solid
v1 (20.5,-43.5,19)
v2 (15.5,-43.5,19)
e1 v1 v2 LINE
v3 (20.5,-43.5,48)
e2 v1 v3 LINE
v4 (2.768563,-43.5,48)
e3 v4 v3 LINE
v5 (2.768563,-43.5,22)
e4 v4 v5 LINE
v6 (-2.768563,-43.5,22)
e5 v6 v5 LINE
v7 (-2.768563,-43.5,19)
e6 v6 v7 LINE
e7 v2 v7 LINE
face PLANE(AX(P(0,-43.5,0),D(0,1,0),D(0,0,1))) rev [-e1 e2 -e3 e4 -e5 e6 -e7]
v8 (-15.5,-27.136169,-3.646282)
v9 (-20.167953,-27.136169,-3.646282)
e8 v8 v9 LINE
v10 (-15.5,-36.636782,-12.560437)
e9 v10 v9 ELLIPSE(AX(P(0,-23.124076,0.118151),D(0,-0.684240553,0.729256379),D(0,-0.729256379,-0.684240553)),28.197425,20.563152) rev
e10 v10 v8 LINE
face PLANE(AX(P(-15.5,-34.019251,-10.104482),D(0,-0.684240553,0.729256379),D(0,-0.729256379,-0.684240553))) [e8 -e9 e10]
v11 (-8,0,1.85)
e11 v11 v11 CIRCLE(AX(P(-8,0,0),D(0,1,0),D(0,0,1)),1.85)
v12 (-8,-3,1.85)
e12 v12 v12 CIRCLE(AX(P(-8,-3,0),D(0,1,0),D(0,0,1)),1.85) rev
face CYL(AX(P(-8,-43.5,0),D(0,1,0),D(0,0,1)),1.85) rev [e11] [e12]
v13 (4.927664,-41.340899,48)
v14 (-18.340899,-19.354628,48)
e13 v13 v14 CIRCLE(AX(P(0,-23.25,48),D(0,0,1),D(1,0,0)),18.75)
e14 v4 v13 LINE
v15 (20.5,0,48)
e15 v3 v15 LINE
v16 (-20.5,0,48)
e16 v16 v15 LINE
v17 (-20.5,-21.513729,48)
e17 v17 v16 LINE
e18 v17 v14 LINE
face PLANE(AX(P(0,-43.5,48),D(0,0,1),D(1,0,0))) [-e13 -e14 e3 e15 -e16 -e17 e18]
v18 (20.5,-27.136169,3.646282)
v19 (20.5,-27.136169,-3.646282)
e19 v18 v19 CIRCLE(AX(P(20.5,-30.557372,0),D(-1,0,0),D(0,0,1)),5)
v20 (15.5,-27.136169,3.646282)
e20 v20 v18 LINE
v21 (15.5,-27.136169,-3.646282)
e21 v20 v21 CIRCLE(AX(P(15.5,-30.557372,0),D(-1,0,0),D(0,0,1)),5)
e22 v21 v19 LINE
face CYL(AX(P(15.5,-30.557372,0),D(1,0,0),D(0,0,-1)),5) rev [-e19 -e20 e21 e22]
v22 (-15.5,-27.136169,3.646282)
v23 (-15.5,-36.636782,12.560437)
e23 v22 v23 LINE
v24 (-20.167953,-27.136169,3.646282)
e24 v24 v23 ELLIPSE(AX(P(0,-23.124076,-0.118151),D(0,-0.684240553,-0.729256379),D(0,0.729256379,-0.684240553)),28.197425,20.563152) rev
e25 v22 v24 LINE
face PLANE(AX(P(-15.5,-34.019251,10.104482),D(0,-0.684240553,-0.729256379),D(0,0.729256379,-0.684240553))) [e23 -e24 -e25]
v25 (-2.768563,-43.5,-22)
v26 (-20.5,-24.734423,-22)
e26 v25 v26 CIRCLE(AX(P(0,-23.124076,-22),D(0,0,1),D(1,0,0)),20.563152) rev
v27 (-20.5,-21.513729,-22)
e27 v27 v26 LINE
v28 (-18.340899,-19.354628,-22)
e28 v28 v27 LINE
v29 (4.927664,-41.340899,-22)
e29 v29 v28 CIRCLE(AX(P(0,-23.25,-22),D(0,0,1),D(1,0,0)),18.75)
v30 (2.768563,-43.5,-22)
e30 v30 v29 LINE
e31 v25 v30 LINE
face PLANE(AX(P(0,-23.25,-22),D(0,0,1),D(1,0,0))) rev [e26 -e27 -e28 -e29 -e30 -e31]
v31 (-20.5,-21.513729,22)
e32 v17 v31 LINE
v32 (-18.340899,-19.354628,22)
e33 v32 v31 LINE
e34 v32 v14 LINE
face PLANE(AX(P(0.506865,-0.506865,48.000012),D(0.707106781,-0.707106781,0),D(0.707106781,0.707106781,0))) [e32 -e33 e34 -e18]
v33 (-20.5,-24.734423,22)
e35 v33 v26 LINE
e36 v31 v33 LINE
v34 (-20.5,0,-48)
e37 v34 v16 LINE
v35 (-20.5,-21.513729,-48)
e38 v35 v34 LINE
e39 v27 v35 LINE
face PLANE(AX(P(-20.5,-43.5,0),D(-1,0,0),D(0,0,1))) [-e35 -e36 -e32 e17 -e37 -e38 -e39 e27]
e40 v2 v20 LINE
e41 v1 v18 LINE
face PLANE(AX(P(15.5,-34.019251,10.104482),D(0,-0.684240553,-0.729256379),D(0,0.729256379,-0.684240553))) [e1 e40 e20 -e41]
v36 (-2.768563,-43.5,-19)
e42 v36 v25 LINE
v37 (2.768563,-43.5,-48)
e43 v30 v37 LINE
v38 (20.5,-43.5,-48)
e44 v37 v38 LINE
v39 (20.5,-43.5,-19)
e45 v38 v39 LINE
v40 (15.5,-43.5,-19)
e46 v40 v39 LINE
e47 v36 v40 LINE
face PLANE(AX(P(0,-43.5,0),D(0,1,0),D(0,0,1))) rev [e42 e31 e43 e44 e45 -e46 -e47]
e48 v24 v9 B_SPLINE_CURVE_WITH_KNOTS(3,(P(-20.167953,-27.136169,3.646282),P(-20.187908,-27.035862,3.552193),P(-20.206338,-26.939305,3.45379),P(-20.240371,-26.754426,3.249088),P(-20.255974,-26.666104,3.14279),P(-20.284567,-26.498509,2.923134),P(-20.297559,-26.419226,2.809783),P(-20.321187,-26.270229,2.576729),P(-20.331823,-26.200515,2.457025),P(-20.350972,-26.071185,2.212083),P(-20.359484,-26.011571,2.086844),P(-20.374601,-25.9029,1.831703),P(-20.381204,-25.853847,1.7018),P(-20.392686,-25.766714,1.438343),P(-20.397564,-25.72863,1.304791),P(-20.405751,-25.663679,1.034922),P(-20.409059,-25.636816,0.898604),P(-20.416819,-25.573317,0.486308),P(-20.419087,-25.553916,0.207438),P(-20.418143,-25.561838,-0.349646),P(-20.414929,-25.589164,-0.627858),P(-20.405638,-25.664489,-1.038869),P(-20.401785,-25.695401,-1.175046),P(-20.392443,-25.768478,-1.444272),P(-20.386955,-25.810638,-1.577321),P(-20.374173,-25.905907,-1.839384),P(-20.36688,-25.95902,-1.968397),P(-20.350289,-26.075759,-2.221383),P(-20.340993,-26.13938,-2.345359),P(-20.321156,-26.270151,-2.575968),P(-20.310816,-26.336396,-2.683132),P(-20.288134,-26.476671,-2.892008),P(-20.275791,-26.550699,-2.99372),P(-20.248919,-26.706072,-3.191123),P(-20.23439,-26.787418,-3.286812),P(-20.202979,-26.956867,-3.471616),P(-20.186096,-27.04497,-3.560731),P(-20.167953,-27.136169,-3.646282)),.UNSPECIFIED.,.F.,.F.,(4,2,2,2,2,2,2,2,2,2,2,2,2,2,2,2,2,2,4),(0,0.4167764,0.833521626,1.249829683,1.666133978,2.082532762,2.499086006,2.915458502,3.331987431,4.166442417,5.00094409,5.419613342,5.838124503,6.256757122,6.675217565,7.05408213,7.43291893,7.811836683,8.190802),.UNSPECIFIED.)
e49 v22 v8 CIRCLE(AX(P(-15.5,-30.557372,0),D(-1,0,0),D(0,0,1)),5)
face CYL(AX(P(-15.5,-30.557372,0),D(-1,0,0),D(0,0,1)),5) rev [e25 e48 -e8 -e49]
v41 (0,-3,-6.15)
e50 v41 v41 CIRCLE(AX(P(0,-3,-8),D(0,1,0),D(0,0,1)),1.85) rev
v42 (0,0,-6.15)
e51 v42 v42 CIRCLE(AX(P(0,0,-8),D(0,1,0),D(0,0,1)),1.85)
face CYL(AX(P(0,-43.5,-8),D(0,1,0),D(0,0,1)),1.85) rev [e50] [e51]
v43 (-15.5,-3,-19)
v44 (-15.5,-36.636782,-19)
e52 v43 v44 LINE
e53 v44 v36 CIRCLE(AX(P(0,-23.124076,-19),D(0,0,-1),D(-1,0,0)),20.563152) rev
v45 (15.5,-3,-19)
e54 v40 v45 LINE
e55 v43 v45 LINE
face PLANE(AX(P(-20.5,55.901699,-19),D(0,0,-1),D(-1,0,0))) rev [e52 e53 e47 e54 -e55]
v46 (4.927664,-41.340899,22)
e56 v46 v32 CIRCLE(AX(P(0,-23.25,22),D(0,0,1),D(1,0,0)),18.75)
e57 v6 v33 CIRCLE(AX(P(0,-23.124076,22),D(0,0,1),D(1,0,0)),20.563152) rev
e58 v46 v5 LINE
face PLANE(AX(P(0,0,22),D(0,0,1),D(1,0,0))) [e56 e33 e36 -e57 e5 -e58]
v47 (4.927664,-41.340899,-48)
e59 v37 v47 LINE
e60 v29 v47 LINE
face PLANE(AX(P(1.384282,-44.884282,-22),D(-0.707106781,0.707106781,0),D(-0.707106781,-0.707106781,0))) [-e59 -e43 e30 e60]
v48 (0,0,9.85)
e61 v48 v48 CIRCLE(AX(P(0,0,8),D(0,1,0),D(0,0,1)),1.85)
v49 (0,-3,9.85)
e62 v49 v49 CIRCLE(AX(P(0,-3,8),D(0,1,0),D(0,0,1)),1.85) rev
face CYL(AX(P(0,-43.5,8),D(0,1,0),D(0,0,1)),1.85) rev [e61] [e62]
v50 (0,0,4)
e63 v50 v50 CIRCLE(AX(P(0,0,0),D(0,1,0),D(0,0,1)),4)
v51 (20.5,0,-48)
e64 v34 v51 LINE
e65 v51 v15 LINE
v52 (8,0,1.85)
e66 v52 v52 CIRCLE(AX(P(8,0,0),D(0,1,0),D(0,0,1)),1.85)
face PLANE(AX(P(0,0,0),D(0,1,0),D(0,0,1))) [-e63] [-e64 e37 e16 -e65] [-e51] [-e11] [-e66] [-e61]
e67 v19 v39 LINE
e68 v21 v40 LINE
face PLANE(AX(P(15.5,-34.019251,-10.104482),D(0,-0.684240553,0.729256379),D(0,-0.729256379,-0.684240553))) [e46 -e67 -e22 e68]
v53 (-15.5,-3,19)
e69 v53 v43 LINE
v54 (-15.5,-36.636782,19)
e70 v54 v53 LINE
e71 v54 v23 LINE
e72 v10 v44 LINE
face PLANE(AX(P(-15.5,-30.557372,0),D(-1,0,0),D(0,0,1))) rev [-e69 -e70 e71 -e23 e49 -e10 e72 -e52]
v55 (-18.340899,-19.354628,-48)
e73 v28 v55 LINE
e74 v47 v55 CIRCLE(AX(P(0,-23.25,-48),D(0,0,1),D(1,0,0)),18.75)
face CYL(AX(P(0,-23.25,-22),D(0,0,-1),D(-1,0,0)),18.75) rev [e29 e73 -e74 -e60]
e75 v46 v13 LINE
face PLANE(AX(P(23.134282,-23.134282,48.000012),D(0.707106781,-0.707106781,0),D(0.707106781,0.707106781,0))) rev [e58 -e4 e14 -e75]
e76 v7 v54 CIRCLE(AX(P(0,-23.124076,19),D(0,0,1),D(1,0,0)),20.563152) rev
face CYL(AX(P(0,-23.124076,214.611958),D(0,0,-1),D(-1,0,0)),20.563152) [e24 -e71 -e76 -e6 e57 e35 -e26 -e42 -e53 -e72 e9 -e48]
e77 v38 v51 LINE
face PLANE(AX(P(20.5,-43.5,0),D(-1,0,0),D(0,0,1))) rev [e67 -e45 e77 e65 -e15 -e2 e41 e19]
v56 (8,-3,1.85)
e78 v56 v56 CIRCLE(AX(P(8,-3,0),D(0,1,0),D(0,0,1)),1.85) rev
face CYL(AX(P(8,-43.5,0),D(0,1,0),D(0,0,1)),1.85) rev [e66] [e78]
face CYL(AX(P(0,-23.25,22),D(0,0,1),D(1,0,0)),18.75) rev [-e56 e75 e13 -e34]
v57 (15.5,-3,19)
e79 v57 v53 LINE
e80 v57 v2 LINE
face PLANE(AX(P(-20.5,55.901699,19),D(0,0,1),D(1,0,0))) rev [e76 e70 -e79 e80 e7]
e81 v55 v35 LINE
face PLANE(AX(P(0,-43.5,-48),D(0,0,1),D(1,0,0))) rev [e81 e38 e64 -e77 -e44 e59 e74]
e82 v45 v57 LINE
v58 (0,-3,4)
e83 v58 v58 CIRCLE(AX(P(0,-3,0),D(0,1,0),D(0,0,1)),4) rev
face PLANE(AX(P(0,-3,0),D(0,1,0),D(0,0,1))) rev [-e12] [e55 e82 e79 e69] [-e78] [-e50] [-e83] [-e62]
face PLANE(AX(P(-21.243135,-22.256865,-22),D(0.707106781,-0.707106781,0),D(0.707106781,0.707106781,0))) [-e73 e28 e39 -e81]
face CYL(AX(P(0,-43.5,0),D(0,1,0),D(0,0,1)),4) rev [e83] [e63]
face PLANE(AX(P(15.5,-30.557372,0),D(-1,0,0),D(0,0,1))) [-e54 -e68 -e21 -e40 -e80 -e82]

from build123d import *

# Parameters (mm, degrees)
SKETCH1_W               = 41
SKETCH1_H               = 96
SKETCH1_R               = 4
SKETCH1_R_2             = 1.85
BOSS_EXTRUDE1_DEPTH     = 43.5
CUT_EXTRUDE1_DEPTH      = 108.370852656
CUT_EXTRUDE1_DEPTH_BACK = 26
CUT_EXTRUDE2_START      = -96
CUT_EXTRUDE2_DEPTH      = 26
SKETCH4_W               = 41
SKETCH4_H               = 38
CUT_EXTRUDE4_DEPTH      = 40.5
BOSS_EXTRUDE2_START     = 20.5
BOSS_EXTRUDE2_DEPTH     = 5
BOSS_EXTRUDE3_START     = -15.5
BOSS_EXTRUDE3_DEPTH     = 5
CUT_EXTRUDE5_START      = -44
CUT_EXTRUDE5_DEPTH      = 44


# Read off the part's stored shape, not the designer's step: Cut-Extrude5
with BuildPart() as part:
    # Sketch1 → Boss-Extrude1 (new body)
    with BuildSketch(Plane(origin=(0, 0, 0), x_dir=(1, 0, 0), z_dir=(0, 1, 0))):
        Rectangle(SKETCH1_W, SKETCH1_H)
        with Locations(Location((0, 0, 0), (0, 0, 270))):
            Circle(SKETCH1_R, mode=Mode.SUBTRACT)
        with Locations(Location((0, -8, 0), (0, 0, 270))):
            Circle(SKETCH1_R_2, mode=Mode.SUBTRACT)
        with Locations(Location((-8, 0, 0), (0, 0, 270))):
            Circle(SKETCH1_R_2, mode=Mode.SUBTRACT)
        with Locations(Location((0, 8, 0), (0, 0, 270))):
            Circle(SKETCH1_R_2, mode=Mode.SUBTRACT)
        with Locations(Location((8, 0, 0), (0, 0, 270))):
            Circle(SKETCH1_R_2, mode=Mode.SUBTRACT)
    extrude(amount=-BOSS_EXTRUDE1_DEPTH)

    # Sketch3 → Cut-Extrude1 (cut, two sides: drawn at the far end of the back side and taken through both)
    with BuildSketch(Plane.XY.offset(48).offset(-CUT_EXTRUDE1_DEPTH_BACK)):
        with BuildLine():
            Line((-18.340899032, -19.35462804), (-20.5, -21.513729008))
            Line((-20.5, -21.513729008), (-20.5, -43.5))
            Line((-20.5, -43.5), (2.768563004, -43.5))
            Line((2.768563004, -43.5), (4.927663972, -41.340899032))
            ThreePointArc((4.927663972, -41.340899032), (12.877412268, -9.621546189), (-18.340899032, -19.35462804))
        make_face()
    extrude(amount=CUT_EXTRUDE1_DEPTH + CUT_EXTRUDE1_DEPTH_BACK, mode=Mode.SUBTRACT)

    # Sketch3<4> → Cut-Extrude2 (cut)
    with BuildSketch(Plane.XY.offset(48).offset(CUT_EXTRUDE2_START)):
        with BuildLine():
            Line((-18.340899032, -19.35462804), (-20.5, -21.513729008))
            Line((-20.5, -21.513729008), (-20.5, -43.5))
            Line((-20.5, -43.5), (2.768563004, -43.5))
            Line((2.768563004, -43.5), (4.927663972, -41.340899032))
            ThreePointArc((4.927663972, -41.340899032), (12.877412268, -9.621546189), (-18.340899032, -19.35462804))
        make_face()
    extrude(amount=CUT_EXTRUDE2_DEPTH, mode=Mode.SUBTRACT)

    # Sketch4 → Cut-Extrude4 (cut)
    with BuildSketch(Plane.XZ.offset(43.5)):
        Rectangle(SKETCH4_W, SKETCH4_H)
    extrude(amount=-CUT_EXTRUDE4_DEPTH, mode=Mode.SUBTRACT)

    # Sketch5 → Boss-Extrude2 (add)
    with BuildSketch(Plane(origin=(0, 0, 0), x_dir=(0, 0, -1), z_dir=(1, 0, 0)).offset(BOSS_EXTRUDE2_START)):
        with BuildLine():
            Line((-19, -43.5), (-3.646281893, -27.13616886))
            ThreePointArc((-3.646281893, -27.13616886), (0, -25.557371624), (3.646281893, -27.13616886))
            Line((3.646281893, -27.13616886), (19, -43.5))
            Line((19, -43.5), (19, -3))
            Line((19, -3), (-19, -3))
            Line((-19, -3), (-19, -43.5))
        make_face()
    extrude(amount=-BOSS_EXTRUDE2_DEPTH)

    # Sketch5<2> → Boss-Extrude3 (add)
    with BuildSketch(Plane(origin=(0, 0, 0), x_dir=(0, 0, -1), z_dir=(1, 0, 0)).offset(BOSS_EXTRUDE3_START)):
        with BuildLine():
            Line((-19, -43.5), (-3.646281893, -27.13616886))
            ThreePointArc((-3.646281893, -27.13616886), (0, -25.557371624), (3.646281893, -27.13616886))
            Line((3.646281893, -27.13616886), (19, -43.5))
            Line((19, -43.5), (19, -3))
            Line((19, -3), (-19, -3))
            Line((-19, -3), (-19, -43.5))
        make_face()
    extrude(amount=-BOSS_EXTRUDE3_DEPTH)

    # Cut-Extrude5 outline → Cut-Extrude5 (cut)
    with BuildSketch(Plane.XY.offset(22).offset(CUT_EXTRUDE5_START)):
        with BuildLine():
            Line((-20.5, -43.5), (-2.768563004, -43.5))
            ThreePointArc((-2.768563004, -43.5), (-14.946344874, -37.246752593), (-20.5, -24.734423107))
            Line((-20.5, -24.734423107), (-20.5, -43.5))
        make_face()
    extrude(amount=CUT_EXTRUDE5_DEPTH, mode=Mode.SUBTRACT)


solid = part.part
